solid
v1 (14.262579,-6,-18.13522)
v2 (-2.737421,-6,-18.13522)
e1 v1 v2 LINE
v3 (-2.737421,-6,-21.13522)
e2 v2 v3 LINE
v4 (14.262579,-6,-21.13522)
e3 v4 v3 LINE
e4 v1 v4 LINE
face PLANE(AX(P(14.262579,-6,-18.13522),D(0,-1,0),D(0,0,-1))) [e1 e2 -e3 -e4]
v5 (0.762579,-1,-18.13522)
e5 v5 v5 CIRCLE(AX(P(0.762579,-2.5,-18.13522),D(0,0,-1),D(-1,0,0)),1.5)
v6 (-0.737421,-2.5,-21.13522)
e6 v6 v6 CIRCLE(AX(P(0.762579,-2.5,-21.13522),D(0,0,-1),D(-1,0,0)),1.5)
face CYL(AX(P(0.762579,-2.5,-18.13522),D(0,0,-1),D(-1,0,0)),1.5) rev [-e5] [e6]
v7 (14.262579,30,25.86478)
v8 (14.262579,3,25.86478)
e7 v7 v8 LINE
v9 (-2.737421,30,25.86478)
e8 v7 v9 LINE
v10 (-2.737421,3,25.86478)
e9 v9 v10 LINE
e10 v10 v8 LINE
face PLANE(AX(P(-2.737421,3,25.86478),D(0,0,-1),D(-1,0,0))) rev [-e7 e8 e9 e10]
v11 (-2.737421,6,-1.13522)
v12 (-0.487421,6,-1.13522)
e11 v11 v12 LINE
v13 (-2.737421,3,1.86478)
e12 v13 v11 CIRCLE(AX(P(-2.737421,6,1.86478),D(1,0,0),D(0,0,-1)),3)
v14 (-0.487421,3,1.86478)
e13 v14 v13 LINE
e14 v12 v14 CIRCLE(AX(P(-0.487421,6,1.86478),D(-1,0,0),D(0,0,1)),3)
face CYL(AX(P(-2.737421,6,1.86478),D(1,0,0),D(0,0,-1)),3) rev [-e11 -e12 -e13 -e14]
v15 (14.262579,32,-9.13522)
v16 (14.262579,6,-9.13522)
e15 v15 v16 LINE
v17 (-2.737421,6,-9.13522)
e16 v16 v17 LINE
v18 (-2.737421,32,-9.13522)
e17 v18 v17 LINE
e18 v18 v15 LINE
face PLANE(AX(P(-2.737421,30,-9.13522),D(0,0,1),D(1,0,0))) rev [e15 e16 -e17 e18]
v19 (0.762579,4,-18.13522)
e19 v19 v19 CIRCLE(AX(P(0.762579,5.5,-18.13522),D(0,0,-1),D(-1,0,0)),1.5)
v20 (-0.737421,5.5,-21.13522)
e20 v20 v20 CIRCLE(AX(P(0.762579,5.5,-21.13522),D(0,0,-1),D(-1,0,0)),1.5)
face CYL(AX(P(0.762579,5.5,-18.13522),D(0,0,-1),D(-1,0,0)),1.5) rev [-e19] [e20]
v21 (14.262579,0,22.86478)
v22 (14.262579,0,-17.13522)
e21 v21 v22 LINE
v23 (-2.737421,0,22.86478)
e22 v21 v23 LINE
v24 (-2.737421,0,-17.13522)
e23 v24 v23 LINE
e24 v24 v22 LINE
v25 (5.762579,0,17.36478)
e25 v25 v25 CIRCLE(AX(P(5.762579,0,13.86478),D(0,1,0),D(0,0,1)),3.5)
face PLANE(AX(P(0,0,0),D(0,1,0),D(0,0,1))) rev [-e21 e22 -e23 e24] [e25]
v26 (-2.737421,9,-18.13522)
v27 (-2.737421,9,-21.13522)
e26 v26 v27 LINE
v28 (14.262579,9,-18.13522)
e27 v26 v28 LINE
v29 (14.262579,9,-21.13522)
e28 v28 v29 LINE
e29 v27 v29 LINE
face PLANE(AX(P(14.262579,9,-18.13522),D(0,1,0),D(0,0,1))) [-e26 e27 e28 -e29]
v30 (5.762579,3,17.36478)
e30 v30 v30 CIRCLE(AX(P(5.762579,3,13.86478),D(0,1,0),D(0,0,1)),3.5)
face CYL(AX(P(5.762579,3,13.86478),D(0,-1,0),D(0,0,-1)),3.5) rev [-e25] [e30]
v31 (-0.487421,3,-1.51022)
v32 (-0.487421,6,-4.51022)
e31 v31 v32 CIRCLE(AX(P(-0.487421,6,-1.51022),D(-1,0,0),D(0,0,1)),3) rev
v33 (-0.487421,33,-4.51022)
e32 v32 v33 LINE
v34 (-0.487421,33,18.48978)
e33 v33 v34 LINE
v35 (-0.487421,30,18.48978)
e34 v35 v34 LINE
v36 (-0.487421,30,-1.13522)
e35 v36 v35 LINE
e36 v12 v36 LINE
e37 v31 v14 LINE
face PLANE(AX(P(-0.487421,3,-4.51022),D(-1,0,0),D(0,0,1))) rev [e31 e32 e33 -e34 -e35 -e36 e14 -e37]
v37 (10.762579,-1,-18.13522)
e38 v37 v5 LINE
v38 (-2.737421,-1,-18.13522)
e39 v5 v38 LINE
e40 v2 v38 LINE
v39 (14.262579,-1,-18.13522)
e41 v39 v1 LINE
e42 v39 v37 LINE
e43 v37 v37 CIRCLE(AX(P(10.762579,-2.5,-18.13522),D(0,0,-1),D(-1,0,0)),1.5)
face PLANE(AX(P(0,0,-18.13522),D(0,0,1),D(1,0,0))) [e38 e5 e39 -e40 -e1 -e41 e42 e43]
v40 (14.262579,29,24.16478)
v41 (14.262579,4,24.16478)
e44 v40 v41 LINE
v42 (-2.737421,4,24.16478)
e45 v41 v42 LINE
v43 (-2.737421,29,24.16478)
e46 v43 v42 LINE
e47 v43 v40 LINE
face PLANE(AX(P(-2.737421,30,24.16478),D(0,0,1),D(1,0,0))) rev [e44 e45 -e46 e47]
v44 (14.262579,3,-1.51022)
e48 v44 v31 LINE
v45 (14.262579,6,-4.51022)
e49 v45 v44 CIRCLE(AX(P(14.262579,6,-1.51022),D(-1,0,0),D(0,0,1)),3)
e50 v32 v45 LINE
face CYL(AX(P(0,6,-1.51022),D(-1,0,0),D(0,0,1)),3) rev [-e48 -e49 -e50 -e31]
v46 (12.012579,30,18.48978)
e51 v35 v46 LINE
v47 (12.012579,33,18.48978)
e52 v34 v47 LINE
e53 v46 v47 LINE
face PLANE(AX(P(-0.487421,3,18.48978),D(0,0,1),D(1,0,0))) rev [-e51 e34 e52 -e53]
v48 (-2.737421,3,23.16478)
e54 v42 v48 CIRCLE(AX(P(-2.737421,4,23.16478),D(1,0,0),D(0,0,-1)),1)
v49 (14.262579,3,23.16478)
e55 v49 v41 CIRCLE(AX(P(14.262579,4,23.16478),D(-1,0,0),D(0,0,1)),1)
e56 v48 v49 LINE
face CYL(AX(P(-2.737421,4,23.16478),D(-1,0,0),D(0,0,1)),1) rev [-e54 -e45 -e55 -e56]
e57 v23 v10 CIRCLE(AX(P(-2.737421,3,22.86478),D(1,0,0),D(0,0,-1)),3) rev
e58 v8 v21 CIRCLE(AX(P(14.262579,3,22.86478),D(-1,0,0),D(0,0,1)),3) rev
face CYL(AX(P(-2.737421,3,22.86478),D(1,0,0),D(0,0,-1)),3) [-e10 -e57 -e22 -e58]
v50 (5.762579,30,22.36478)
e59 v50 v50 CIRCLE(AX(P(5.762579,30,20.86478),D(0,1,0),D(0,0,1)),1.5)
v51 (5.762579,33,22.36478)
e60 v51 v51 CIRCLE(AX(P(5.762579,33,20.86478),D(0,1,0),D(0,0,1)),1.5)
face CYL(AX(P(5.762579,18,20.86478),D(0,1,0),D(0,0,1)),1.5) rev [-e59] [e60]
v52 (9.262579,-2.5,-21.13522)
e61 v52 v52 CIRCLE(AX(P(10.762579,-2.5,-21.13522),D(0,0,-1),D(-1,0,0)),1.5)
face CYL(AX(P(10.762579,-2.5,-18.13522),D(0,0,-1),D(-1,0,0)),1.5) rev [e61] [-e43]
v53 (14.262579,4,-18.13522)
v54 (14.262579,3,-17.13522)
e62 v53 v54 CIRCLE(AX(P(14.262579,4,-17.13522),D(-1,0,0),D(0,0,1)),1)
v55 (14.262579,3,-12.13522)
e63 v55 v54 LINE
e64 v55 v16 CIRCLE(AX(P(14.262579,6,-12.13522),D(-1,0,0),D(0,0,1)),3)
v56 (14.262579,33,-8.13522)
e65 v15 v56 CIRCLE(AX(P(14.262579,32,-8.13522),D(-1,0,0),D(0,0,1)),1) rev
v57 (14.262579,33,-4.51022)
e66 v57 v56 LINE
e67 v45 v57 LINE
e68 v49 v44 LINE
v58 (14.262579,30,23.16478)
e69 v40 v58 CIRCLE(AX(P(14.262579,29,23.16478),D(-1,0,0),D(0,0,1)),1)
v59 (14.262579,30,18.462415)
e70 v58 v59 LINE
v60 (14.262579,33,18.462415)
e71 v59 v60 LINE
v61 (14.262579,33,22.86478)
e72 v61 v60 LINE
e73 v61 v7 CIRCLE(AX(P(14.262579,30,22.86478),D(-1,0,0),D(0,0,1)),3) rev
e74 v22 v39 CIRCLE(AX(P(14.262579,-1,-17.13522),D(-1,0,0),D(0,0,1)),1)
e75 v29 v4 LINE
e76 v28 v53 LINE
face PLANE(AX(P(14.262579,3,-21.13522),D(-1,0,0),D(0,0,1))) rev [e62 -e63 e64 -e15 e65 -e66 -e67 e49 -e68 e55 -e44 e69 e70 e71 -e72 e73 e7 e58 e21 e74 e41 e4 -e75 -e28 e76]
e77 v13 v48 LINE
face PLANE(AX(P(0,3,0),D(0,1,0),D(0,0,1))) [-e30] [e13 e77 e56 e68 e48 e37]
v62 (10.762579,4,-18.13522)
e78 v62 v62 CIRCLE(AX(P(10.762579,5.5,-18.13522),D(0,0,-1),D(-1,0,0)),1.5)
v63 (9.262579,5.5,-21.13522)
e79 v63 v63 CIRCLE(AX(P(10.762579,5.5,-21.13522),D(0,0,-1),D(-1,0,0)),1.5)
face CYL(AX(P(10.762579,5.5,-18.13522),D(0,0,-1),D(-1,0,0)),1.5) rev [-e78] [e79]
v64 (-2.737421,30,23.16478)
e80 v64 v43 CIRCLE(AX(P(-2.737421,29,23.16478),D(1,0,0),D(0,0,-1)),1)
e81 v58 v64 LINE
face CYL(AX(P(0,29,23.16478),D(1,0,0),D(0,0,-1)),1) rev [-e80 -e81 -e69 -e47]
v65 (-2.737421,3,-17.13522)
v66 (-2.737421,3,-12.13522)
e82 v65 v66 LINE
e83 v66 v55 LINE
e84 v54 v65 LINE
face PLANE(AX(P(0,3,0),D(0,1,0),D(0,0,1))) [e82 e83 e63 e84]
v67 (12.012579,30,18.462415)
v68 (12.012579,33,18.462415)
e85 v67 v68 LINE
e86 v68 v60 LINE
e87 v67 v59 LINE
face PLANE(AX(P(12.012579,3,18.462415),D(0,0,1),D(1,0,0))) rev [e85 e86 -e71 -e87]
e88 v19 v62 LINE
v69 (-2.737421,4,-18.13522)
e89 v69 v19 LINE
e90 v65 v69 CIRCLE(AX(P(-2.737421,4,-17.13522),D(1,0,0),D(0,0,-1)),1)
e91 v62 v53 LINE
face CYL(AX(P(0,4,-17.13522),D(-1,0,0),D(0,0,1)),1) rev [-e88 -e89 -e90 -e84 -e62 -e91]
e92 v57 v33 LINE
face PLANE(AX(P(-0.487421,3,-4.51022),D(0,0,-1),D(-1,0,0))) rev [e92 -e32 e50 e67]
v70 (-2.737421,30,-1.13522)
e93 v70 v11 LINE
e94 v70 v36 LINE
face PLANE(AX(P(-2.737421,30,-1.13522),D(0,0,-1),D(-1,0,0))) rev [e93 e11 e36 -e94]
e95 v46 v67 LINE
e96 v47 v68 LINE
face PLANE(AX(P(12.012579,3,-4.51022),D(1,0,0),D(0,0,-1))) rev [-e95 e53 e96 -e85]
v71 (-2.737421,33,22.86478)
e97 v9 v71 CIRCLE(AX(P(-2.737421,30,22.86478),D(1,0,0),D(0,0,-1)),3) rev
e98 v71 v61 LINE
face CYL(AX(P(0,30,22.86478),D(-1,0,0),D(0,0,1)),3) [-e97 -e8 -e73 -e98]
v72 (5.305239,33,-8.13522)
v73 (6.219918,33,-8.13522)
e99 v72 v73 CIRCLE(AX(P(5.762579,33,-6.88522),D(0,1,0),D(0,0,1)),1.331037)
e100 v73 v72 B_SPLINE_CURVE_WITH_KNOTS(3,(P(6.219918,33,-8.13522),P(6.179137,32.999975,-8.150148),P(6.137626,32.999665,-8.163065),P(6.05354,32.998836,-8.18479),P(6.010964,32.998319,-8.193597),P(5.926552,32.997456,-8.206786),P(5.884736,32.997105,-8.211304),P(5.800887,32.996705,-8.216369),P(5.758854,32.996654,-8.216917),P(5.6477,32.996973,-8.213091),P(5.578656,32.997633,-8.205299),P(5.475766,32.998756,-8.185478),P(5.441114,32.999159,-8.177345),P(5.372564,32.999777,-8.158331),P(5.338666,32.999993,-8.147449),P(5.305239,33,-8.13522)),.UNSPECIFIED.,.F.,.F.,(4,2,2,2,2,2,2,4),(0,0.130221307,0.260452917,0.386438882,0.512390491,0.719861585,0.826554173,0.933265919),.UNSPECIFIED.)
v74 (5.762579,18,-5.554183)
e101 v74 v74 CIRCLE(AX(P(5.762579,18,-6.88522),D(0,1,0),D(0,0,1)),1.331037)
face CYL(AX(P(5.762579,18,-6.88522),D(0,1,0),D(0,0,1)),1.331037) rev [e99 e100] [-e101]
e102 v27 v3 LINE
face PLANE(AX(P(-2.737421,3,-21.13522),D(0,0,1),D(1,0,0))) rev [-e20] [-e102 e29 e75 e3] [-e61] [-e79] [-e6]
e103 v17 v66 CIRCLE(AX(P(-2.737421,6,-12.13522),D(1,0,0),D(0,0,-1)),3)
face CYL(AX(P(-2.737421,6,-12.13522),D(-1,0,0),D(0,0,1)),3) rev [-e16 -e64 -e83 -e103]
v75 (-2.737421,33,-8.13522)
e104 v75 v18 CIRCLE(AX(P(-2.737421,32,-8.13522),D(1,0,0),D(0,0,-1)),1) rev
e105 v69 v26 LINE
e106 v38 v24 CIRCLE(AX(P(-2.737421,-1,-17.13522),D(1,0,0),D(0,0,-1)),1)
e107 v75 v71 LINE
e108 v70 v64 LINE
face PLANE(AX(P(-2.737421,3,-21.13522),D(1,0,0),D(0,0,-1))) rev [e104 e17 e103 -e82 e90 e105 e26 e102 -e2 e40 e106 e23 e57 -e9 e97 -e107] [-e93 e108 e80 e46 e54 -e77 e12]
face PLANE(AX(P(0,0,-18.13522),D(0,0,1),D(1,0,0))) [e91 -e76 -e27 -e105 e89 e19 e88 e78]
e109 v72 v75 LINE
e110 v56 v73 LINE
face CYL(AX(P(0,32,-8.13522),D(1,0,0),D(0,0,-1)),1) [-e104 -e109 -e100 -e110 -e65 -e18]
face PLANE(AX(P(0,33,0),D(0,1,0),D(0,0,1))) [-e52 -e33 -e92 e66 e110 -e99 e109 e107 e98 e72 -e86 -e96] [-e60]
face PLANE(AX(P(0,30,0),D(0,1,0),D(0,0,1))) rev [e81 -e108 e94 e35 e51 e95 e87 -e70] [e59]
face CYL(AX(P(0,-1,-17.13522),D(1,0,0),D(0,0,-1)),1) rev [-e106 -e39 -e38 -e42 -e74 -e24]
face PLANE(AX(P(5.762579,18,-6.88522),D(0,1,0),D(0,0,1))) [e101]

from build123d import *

# Parameters (mm, degrees)
SKETCH1_W           = 17
SKETCH1_H           = 47
SKETCH1_R           = 3.5
BOSS_EXTRUDE1_DEPTH = 3
SKETCH2_W           = 17
SKETCH2_H           = 8
SKETCH2_H_2         = 1.7
BOSS_EXTRUDE2_DEPTH = 27
SKETCH3_W           = 17
SKETCH3_H           = 35
BOSS_EXTRUDE3_DEPTH = 3
SKETCH4_R           = 3.5
CUT_EXTRUDE1_DEPTH  = 3
SKETCH5_R           = 1.5
SKETCH5_R_2         = 1.331036909
CUT_EXTRUDE2_DEPTH  = 15
SKETCH7_W           = 12.5
SKETCH7_H           = 23
CUT_EXTRUDE3_DEPTH  = 30
SKETCH8_W           = 17
SKETCH8_H           = 15
SKETCH8_R           = 1.5
BOSS_EXTRUDE4_DEPTH = 3
SKETCH9_W           = 2.25
SKETCH9_H           = 22.972634834
CUT_EXTRUDE4_DEPTH  = 30
FILLET8_R           = 3
FILLET9_R           = 3
FILLET10_R          = 3
FILLET11_R          = 3
FILLET12_R          = 3
FILLET13_START      = -2.737421384
FILLET13_DEPTH      = 17
FILLET14_START      = -2.737421384
FILLET14_DEPTH      = 17
FILLET15_R          = 1
FILLET16_R          = 1
FILLET17_R          = 1


with BuildPart() as part:
    # Sketch1 → Boss-Extrude1 (new body)
    with BuildSketch(Plane(origin=(0, 0, 0), x_dir=(1, 0, 0), z_dir=(0, 1, 0))):
        with Locations((5.762578616, -2.364779874)):
            Rectangle(SKETCH1_W, SKETCH1_H)
        with Locations(Location((5.762578616, -13.864779874, 0), (0, 0, 270))):
            Circle(SKETCH1_R, mode=Mode.SUBTRACT)
    extrude(amount=BOSS_EXTRUDE1_DEPTH)

    # Sketch2 → Boss-Extrude2 (add)
    with BuildSketch(Plane(origin=(0, 3, 0), x_dir=(1, 0, 0), z_dir=(0, 1, 0))):
        with Locations((5.762578616, 5.135220126)):
            Rectangle(SKETCH2_W, SKETCH2_H)
        with Locations((5.762578616, -25.014779874)):
            Rectangle(SKETCH2_W, SKETCH2_H_2)
    extrude(amount=BOSS_EXTRUDE2_DEPTH)

    # Sketch3 → Boss-Extrude3 (add)
    with BuildSketch(Plane(origin=(0, 30, 0), x_dir=(1, 0, 0), z_dir=(0, 1, 0))):
        with Locations((5.762578616, -8.364779874)):
            Rectangle(SKETCH3_W, SKETCH3_H)
    extrude(amount=BOSS_EXTRUDE3_DEPTH)

    # Sketch4 → Cut-Extrude1 (cut)
    with BuildSketch(Plane.XZ.offset(-30)):
        with Locations(Location((5.762578616, 13.864779874, 0), (0, 0, 90))):
            Circle(SKETCH4_R)
    extrude(amount=-CUT_EXTRUDE1_DEPTH, mode=Mode.SUBTRACT)

    # Sketch5 → Cut-Extrude2 (cut)
    with BuildSketch(Plane(origin=(0, 33, 0), x_dir=(1, 0, 0), z_dir=(0, 1, 0))):
        with Locations(Location((5.762578616, -20.864779874, 0), (0, 0, 270))):
            Circle(SKETCH5_R)
        with Locations(Location((5.762578616, 6.885220126, 0), (0, 0, 270))):
            Circle(SKETCH5_R_2)
    extrude(amount=-CUT_EXTRUDE2_DEPTH, mode=Mode.SUBTRACT)

    # Sketch7 → Cut-Extrude3 (cut)
    with BuildSketch(Plane(origin=(0, 33, 0), x_dir=(1, 0, 0), z_dir=(0, 1, 0))):
        with Locations((5.762578616, -6.989779874)):
            Rectangle(SKETCH7_W, SKETCH7_H)
    extrude(amount=-CUT_EXTRUDE3_DEPTH, mode=Mode.SUBTRACT)

    # Sketch8 → Boss-Extrude4 (add)
    with BuildSketch(Plane(origin=(0, 0, -21.135220126), x_dir=(-1, 0, 0), z_dir=(0, 0, -1))):
        with Locations((-5.762578616, 1.5)):
            Rectangle(SKETCH8_W, SKETCH8_H)
        with Locations((-10.762578616, 5.5)):
            Circle(SKETCH8_R, mode=Mode.SUBTRACT)
        with Locations((-0.762578616, 5.5)):
            Circle(SKETCH8_R, mode=Mode.SUBTRACT)
        with Locations((-10.762578616, -2.5)):
            Circle(SKETCH8_R, mode=Mode.SUBTRACT)
        with Locations((-0.762578616, -2.5)):
            Circle(SKETCH8_R, mode=Mode.SUBTRACT)
    extrude(amount=-BOSS_EXTRUDE4_DEPTH)

    # Sketch9 → Cut-Extrude4 (cut)
    with BuildSketch(Plane(origin=(0, 33, 0), x_dir=(1, 0, 0), z_dir=(0, 1, 0))):
        with Locations((13.137578616, -6.976097291)):
            Rectangle(SKETCH9_W, SKETCH9_H)
    extrude(amount=-CUT_EXTRUDE4_DEPTH, mode=Mode.SUBTRACT)

    # Fillet8
    fillet8_edges = [part.edges().sort_by_distance(p)[0] for p in [
        (5.762578616, 0, 25.864779874),
    ]]
    fillet(fillet8_edges, radius=FILLET8_R)

    # Fillet9
    fillet9_edges = [part.edges().sort_by_distance(p)[0] for p in [
        (5.762578616, 33, 25.864779874),
    ]]
    fillet(fillet9_edges, radius=FILLET9_R)

    # Fillet10
    fillet10_edges = [part.edges().sort_by_distance(p)[0] for p in [
        (5.762578616, 3, -9.135220126),
    ]]
    fillet(fillet10_edges, radius=FILLET10_R)

    # Fillet11
    fillet11_edges = [part.edges().sort_by_distance(p)[0] for p in [
        (6.887578616, 3, -4.510220126),
    ]]
    fillet(fillet11_edges, radius=FILLET11_R)

    # Fillet12
    fillet12_edges = [part.edges().sort_by_distance(p)[0] for p in [
        (-1.612421384, 3, -1.135220126),
    ]]
    fillet(fillet12_edges, radius=FILLET12_R)

    # Fillet13: read off the stored shape, not the designer's step
    # Fillet13 outline → Fillet13 (add)
    with BuildSketch(Plane.YZ.offset(FILLET13_START)):
        with BuildLine():
            Line((3, -18.135220126), (4, -18.135220126))
            ThreePointArc((4, -18.135220126), (3.292893219, -17.842326907), (3, -17.135220126))
            Line((3, -17.135220126), (3, -18.135220126))
        make_face()
    extrude(amount=FILLET13_DEPTH)

    # Fillet14: read off the stored shape, not the designer's step
    # Fillet14 outline → Fillet14 (add)
    with BuildSketch(Plane.YZ.offset(FILLET14_START)):
        with BuildLine():
            ThreePointArc((0, -17.135220126), (-0.292893219, -17.842326907), (-1, -18.135220126))
            Line((-1, -18.135220126), (0, -18.135220126))
            Line((0, -18.135220126), (0, -17.135220126))
        make_face()
    extrude(amount=FILLET14_DEPTH)

    # Fillet15
    fillet15_edges = [part.edges().sort_by_distance(p)[0] for p in [
        (5.762578616, 3, 24.164779874),
    ]]
    fillet(fillet15_edges, radius=FILLET15_R)

    # Fillet16
    fillet16_edges = [part.edges().sort_by_distance(p)[0] for p in [
        (5.762578616, 30, 24.164779874),
    ]]
    fillet(fillet16_edges, radius=FILLET16_R)

    # Fillet17
    # the kernel refuses this fillet: 1 mm, written as the material it takes off along each edge
    with BuildSketch(Plane(origin=(-5.237421384, 33, -9.135220126), x_dir=(0, -1, 0), z_dir=(1, 0, 0))) as fillet17_piece_1:
        with BuildLine():
            CenterArc((FILLET17_R, -FILLET17_R), FILLET17_R, 90, 90)
            Line((0, -FILLET17_R), (0, 0))
            Line((0, 0), (FILLET17_R, 0))
        make_face()
    extrude(amount=22, mode=Mode.SUBTRACT)


solid = part.part
